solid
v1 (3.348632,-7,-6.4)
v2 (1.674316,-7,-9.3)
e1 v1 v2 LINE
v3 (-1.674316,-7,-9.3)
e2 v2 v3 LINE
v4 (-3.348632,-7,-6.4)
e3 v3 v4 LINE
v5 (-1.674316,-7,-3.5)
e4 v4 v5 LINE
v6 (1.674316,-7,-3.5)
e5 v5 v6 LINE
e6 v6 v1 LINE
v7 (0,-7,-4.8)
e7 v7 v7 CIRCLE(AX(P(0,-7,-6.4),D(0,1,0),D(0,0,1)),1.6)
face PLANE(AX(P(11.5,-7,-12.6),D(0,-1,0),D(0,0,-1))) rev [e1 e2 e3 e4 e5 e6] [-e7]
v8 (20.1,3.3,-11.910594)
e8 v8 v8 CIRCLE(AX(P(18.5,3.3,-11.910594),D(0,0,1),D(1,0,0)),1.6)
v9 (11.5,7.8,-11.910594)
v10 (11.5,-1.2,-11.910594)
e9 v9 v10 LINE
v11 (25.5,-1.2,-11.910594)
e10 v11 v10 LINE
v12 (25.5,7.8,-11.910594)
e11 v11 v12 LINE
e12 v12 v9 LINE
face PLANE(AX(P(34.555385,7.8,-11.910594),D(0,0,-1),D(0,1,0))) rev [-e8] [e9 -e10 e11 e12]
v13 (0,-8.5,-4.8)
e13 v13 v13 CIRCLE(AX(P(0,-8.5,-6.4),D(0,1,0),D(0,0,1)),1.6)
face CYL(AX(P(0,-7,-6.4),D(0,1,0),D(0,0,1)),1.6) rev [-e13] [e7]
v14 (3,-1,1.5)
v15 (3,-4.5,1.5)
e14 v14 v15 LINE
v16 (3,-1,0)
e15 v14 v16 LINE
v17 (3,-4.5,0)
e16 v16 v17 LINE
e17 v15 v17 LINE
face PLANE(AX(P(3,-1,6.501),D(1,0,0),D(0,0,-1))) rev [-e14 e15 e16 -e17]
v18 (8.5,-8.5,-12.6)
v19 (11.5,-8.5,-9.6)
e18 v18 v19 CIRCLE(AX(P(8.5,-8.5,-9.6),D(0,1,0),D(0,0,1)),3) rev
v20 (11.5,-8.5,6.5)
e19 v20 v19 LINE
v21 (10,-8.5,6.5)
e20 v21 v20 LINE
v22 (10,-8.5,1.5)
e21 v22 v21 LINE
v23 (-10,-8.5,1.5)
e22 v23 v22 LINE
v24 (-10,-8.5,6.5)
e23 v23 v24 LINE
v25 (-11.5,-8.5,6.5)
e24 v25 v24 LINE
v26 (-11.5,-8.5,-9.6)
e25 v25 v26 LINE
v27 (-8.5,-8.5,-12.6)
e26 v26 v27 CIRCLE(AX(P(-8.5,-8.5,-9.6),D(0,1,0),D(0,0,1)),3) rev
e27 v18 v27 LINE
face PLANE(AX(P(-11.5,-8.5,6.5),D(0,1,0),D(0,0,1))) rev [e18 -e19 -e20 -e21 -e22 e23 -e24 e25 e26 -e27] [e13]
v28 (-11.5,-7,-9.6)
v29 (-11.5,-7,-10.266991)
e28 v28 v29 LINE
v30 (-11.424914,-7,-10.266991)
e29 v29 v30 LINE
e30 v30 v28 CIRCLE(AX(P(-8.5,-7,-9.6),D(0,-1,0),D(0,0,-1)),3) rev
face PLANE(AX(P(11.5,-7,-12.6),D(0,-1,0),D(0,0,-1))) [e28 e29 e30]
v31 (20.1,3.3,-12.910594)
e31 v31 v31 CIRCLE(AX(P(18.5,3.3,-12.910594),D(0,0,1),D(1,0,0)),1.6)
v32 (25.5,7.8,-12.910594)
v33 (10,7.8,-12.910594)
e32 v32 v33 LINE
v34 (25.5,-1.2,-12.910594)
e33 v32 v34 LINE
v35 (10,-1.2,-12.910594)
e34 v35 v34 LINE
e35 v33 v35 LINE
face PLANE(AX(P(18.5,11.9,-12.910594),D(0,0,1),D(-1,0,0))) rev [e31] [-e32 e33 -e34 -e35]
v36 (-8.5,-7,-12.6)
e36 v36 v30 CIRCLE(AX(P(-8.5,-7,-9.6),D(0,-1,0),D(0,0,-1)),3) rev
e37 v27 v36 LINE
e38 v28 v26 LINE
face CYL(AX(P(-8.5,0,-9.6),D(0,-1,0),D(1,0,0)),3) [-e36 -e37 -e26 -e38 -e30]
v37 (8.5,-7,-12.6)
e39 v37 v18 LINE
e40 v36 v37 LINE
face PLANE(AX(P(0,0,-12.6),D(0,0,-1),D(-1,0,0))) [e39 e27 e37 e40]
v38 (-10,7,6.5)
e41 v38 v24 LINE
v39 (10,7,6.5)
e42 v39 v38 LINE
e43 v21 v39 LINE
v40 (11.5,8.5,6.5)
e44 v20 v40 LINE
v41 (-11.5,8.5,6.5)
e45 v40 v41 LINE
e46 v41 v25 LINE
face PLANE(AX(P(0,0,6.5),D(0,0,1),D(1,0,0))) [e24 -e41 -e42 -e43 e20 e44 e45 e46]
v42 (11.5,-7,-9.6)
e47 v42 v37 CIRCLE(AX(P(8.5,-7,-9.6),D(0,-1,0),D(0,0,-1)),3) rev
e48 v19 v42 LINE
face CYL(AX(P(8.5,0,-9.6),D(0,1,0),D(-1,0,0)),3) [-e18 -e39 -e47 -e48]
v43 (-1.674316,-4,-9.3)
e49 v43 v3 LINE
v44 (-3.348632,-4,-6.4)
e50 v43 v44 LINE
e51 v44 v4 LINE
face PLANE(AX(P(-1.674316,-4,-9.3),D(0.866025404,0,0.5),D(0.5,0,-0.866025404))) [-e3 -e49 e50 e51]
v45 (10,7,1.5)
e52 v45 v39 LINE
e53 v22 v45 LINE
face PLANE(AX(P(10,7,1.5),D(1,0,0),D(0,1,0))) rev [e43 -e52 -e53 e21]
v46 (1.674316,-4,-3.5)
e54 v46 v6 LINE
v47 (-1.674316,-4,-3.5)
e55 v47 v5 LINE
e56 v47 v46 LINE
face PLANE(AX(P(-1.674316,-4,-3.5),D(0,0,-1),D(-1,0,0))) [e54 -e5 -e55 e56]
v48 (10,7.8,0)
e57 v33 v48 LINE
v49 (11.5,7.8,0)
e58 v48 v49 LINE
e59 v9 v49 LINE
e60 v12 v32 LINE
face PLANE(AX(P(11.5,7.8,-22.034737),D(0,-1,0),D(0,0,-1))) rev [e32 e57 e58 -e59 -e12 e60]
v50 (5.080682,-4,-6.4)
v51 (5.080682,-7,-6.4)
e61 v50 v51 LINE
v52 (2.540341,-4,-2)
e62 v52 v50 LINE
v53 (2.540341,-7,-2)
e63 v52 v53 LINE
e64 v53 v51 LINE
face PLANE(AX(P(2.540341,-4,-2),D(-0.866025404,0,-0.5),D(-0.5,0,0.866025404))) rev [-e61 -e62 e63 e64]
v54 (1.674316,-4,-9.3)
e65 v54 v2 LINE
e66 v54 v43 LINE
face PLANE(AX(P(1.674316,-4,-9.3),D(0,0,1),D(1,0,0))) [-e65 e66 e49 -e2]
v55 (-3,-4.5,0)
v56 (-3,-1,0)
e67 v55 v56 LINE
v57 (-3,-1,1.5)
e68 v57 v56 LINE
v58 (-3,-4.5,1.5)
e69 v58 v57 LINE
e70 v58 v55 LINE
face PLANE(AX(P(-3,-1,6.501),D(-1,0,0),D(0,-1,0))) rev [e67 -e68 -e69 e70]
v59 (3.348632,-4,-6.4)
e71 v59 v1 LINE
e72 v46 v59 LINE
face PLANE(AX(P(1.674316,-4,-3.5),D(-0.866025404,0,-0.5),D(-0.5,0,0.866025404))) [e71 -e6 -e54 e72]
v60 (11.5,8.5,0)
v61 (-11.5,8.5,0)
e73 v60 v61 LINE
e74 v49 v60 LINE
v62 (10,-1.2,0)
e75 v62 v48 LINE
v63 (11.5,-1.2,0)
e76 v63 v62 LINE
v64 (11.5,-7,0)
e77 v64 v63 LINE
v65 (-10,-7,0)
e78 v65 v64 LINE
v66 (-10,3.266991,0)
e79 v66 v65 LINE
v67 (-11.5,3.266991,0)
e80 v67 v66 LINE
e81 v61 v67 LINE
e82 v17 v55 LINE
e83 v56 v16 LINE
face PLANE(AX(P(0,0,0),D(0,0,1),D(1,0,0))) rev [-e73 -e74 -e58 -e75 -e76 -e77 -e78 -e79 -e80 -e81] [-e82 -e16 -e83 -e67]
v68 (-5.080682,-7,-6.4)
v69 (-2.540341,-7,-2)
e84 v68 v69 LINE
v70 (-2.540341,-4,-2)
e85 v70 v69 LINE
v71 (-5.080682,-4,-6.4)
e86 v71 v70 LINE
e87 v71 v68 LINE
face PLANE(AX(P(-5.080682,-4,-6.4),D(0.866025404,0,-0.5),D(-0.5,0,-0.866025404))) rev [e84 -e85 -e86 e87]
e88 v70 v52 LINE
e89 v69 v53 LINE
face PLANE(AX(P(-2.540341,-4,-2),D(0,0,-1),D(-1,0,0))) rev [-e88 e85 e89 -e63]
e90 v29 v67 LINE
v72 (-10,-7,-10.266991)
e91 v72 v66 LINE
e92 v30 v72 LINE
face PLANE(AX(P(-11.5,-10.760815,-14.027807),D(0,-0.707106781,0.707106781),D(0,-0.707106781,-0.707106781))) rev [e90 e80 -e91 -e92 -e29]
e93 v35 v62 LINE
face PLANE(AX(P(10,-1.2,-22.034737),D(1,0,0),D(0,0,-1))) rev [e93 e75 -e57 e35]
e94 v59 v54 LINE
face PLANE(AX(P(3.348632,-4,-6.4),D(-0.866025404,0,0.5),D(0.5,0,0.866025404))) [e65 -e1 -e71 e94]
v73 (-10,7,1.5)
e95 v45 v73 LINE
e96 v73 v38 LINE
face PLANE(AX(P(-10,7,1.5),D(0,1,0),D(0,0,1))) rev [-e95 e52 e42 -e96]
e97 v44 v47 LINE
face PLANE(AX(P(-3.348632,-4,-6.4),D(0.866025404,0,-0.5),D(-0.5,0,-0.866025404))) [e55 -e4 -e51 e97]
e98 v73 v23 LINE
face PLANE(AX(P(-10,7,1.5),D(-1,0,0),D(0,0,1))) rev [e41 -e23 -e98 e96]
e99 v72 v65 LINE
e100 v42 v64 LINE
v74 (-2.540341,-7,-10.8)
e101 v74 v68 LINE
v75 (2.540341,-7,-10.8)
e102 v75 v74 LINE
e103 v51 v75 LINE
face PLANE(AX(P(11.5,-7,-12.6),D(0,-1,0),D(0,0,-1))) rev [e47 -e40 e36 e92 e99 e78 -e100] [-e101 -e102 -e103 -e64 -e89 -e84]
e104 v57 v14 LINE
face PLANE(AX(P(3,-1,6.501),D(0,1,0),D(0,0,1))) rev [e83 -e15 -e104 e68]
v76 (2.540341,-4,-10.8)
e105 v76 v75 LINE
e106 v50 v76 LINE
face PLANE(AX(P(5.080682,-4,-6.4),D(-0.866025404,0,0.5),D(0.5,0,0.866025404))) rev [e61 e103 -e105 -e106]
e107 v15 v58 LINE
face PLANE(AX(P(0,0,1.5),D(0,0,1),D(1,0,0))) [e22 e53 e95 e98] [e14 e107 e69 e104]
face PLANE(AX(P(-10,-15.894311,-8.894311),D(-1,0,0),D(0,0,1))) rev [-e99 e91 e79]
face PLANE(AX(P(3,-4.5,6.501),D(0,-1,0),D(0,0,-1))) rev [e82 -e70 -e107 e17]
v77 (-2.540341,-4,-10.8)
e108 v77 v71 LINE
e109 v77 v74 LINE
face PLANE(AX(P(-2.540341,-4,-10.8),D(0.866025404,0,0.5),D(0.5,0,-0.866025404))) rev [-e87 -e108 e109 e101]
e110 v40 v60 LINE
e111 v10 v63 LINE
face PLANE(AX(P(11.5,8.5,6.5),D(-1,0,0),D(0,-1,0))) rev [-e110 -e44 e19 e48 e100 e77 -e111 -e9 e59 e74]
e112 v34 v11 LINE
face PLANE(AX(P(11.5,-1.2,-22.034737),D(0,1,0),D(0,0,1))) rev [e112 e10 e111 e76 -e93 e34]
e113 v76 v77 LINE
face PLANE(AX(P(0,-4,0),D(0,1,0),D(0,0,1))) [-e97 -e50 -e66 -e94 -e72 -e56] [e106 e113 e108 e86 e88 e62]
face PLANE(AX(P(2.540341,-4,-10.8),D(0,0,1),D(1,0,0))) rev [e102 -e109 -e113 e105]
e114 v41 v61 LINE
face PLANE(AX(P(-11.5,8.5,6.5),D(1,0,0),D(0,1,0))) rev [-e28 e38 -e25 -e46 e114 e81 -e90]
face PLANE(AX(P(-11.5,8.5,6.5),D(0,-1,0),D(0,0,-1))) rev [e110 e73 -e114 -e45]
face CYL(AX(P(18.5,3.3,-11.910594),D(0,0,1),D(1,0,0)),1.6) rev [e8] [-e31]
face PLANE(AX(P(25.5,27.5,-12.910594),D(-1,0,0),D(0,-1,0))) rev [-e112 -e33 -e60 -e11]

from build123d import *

# Parameters (mm, degrees)
SKETCH_1_W             = 23
SKETCH_1_H             = 17
EXTRUDE_1_DEPTH        = 6.5
SKETCH_2_W             = 20
SKETCH_2_H             = 15.5
CUT_EXTRUDE_1_DEPTH    = 5
SKETCH_3_W             = 23
SKETCH_3_H             = 1.5
EXTRUDE_2_DEPTH        = 12.6
FILLET_1_R             = 3
EXTRUDE_3_DEPTH        = 3
HOLE_WIZARD_M3_1_D     = 3.2
EXTRUDE_START          = -11.5
EXTRUDE_6_DEPTH        = 1.5
CUT_EXTRUDE_2534_REACH = 21.059
SKETCH_10_W            = 6
SKETCH_10_H            = 3.5
SKETCH_11_W            = 1.5
SKETCH_11_H            = 9
EXTRUDE_10_DEPTH       = 12.910593501
SKETCH_12_W            = 1
SKETCH_12_H            = 9
EXTRUDE_11_DEPTH       = 14
HOLE_WIZARD_M3_2_D     = 3.2


# Read off the part's stored shape, not the designer's step: 凸台-拉伸6
with BuildPart() as part:
    # 草图1 → 凸台-拉伸1 (new body)
    with BuildSketch(Plane.XY):
        Rectangle(SKETCH_1_W, SKETCH_1_H)
    extrude(amount=EXTRUDE_1_DEPTH)

    # 草图2 → 切除-拉伸1 (cut)
    with BuildSketch(Plane.XY.offset(6.5)):
        with Locations((0, -0.75)):
            Rectangle(SKETCH_2_W, SKETCH_2_H)
    extrude(amount=-CUT_EXTRUDE_1_DEPTH, mode=Mode.SUBTRACT)

    # 草图3 → 凸台-拉伸2 (add)
    with BuildSketch(Plane(origin=(0, 0, 0), x_dir=(-1, 0, 0), z_dir=(0, 0, -1))):
        with Locations((0, -7.75)):
            Rectangle(SKETCH_3_W, SKETCH_3_H)
    extrude(amount=EXTRUDE_2_DEPTH)

    # 圆角1
    fillet_1_edges = [part.edges().sort_by_distance(p)[0] for p in [
        (11.5, -7.75, -12.6),
        (-11.5, -7.75, -12.6),
    ]]
    fillet(fillet_1_edges, radius=FILLET_1_R)

    # 草图4 → 凸台-拉伸3 (add)
    with BuildSketch(Plane(origin=(0, -7, 0), x_dir=(1, 0, 0), z_dir=(0, 1, 0))):
        Polygon((5.080682369, 6.4), (2.540341184, 10.8), (-2.540341184, 10.8), (-5.080682369, 6.4), (-2.540341184, 2), (2.540341184, 2), align=None)
        Polygon((3.348631561, 6.4), (1.674315781, 9.3), (-1.674315781, 9.3), (-3.348631561, 6.4), (-1.674315781, 3.5), (1.674315781, 3.5), align=None, mode=Mode.SUBTRACT)
    extrude(amount=EXTRUDE_3_DEPTH)

    # M3 间隙孔1 (through all)
    with Locations(Plane(origin=(0, -7, 0), x_dir=(1, 0, 0), z_dir=(0, 1, 0))):
        with Locations((0, 6.4)):
            Hole(HOLE_WIZARD_M3_1_D / 2)

    # 凸台-拉伸6 outline → 凸台-拉伸6 (add)
    with BuildSketch(Plane.YZ.offset(EXTRUDE_START)):
        Polygon((-7, 0), (-7, -10.266991259), (3.266991259, 0), align=None)
    extrude(amount=EXTRUDE_6_DEPTH)

    # 草图10 → Cut-Extrude 2534 (cut, up to next)
    with BuildSketch(Plane(origin=(0, 0, 0), x_dir=(-1, 0, 0), z_dir=(0, 0, -1)), mode=Mode.PRIVATE) as cut_extrude_2534_sk1:
        with Locations((0, -2.75)):
            Rectangle(SKETCH_10_W, SKETCH_10_H)
    cut_extrude_2534_tool1 = extrude(cut_extrude_2534_sk1.sketch, amount=-CUT_EXTRUDE_2534_REACH, mode=Mode.PRIVATE) & part.part
    add(cut_extrude_2534_tool1.solids().sort_by_distance((0, -2.75, 0))[0], mode=Mode.SUBTRACT)

    # 草图11 → 凸台-拉伸10 (add)
    with BuildSketch(Plane(origin=(0, 0, 0), x_dir=(-1, 0, 0), z_dir=(0, 0, -1))):
        with Locations((-10.75, 3.3)):
            Rectangle(SKETCH_11_W, SKETCH_11_H)
    extrude(amount=EXTRUDE_10_DEPTH)

    # 草图12 → 凸台-拉伸11 (add)
    with BuildSketch(Plane(origin=(11.5, 0, 0), x_dir=(0, 0, -1), z_dir=(1, 0, 0))):
        with Locations((12.410593501, 3.3)):
            Rectangle(SKETCH_12_W, SKETCH_12_H)
    extrude(amount=EXTRUDE_11_DEPTH)

    # M3 间隙孔2 (through all)
    with Locations(Plane.XY.offset(-11.910593501)):
        with Locations((18.5, 3.3)):
            Hole(HOLE_WIZARD_M3_2_D / 2)


solid = part.part
